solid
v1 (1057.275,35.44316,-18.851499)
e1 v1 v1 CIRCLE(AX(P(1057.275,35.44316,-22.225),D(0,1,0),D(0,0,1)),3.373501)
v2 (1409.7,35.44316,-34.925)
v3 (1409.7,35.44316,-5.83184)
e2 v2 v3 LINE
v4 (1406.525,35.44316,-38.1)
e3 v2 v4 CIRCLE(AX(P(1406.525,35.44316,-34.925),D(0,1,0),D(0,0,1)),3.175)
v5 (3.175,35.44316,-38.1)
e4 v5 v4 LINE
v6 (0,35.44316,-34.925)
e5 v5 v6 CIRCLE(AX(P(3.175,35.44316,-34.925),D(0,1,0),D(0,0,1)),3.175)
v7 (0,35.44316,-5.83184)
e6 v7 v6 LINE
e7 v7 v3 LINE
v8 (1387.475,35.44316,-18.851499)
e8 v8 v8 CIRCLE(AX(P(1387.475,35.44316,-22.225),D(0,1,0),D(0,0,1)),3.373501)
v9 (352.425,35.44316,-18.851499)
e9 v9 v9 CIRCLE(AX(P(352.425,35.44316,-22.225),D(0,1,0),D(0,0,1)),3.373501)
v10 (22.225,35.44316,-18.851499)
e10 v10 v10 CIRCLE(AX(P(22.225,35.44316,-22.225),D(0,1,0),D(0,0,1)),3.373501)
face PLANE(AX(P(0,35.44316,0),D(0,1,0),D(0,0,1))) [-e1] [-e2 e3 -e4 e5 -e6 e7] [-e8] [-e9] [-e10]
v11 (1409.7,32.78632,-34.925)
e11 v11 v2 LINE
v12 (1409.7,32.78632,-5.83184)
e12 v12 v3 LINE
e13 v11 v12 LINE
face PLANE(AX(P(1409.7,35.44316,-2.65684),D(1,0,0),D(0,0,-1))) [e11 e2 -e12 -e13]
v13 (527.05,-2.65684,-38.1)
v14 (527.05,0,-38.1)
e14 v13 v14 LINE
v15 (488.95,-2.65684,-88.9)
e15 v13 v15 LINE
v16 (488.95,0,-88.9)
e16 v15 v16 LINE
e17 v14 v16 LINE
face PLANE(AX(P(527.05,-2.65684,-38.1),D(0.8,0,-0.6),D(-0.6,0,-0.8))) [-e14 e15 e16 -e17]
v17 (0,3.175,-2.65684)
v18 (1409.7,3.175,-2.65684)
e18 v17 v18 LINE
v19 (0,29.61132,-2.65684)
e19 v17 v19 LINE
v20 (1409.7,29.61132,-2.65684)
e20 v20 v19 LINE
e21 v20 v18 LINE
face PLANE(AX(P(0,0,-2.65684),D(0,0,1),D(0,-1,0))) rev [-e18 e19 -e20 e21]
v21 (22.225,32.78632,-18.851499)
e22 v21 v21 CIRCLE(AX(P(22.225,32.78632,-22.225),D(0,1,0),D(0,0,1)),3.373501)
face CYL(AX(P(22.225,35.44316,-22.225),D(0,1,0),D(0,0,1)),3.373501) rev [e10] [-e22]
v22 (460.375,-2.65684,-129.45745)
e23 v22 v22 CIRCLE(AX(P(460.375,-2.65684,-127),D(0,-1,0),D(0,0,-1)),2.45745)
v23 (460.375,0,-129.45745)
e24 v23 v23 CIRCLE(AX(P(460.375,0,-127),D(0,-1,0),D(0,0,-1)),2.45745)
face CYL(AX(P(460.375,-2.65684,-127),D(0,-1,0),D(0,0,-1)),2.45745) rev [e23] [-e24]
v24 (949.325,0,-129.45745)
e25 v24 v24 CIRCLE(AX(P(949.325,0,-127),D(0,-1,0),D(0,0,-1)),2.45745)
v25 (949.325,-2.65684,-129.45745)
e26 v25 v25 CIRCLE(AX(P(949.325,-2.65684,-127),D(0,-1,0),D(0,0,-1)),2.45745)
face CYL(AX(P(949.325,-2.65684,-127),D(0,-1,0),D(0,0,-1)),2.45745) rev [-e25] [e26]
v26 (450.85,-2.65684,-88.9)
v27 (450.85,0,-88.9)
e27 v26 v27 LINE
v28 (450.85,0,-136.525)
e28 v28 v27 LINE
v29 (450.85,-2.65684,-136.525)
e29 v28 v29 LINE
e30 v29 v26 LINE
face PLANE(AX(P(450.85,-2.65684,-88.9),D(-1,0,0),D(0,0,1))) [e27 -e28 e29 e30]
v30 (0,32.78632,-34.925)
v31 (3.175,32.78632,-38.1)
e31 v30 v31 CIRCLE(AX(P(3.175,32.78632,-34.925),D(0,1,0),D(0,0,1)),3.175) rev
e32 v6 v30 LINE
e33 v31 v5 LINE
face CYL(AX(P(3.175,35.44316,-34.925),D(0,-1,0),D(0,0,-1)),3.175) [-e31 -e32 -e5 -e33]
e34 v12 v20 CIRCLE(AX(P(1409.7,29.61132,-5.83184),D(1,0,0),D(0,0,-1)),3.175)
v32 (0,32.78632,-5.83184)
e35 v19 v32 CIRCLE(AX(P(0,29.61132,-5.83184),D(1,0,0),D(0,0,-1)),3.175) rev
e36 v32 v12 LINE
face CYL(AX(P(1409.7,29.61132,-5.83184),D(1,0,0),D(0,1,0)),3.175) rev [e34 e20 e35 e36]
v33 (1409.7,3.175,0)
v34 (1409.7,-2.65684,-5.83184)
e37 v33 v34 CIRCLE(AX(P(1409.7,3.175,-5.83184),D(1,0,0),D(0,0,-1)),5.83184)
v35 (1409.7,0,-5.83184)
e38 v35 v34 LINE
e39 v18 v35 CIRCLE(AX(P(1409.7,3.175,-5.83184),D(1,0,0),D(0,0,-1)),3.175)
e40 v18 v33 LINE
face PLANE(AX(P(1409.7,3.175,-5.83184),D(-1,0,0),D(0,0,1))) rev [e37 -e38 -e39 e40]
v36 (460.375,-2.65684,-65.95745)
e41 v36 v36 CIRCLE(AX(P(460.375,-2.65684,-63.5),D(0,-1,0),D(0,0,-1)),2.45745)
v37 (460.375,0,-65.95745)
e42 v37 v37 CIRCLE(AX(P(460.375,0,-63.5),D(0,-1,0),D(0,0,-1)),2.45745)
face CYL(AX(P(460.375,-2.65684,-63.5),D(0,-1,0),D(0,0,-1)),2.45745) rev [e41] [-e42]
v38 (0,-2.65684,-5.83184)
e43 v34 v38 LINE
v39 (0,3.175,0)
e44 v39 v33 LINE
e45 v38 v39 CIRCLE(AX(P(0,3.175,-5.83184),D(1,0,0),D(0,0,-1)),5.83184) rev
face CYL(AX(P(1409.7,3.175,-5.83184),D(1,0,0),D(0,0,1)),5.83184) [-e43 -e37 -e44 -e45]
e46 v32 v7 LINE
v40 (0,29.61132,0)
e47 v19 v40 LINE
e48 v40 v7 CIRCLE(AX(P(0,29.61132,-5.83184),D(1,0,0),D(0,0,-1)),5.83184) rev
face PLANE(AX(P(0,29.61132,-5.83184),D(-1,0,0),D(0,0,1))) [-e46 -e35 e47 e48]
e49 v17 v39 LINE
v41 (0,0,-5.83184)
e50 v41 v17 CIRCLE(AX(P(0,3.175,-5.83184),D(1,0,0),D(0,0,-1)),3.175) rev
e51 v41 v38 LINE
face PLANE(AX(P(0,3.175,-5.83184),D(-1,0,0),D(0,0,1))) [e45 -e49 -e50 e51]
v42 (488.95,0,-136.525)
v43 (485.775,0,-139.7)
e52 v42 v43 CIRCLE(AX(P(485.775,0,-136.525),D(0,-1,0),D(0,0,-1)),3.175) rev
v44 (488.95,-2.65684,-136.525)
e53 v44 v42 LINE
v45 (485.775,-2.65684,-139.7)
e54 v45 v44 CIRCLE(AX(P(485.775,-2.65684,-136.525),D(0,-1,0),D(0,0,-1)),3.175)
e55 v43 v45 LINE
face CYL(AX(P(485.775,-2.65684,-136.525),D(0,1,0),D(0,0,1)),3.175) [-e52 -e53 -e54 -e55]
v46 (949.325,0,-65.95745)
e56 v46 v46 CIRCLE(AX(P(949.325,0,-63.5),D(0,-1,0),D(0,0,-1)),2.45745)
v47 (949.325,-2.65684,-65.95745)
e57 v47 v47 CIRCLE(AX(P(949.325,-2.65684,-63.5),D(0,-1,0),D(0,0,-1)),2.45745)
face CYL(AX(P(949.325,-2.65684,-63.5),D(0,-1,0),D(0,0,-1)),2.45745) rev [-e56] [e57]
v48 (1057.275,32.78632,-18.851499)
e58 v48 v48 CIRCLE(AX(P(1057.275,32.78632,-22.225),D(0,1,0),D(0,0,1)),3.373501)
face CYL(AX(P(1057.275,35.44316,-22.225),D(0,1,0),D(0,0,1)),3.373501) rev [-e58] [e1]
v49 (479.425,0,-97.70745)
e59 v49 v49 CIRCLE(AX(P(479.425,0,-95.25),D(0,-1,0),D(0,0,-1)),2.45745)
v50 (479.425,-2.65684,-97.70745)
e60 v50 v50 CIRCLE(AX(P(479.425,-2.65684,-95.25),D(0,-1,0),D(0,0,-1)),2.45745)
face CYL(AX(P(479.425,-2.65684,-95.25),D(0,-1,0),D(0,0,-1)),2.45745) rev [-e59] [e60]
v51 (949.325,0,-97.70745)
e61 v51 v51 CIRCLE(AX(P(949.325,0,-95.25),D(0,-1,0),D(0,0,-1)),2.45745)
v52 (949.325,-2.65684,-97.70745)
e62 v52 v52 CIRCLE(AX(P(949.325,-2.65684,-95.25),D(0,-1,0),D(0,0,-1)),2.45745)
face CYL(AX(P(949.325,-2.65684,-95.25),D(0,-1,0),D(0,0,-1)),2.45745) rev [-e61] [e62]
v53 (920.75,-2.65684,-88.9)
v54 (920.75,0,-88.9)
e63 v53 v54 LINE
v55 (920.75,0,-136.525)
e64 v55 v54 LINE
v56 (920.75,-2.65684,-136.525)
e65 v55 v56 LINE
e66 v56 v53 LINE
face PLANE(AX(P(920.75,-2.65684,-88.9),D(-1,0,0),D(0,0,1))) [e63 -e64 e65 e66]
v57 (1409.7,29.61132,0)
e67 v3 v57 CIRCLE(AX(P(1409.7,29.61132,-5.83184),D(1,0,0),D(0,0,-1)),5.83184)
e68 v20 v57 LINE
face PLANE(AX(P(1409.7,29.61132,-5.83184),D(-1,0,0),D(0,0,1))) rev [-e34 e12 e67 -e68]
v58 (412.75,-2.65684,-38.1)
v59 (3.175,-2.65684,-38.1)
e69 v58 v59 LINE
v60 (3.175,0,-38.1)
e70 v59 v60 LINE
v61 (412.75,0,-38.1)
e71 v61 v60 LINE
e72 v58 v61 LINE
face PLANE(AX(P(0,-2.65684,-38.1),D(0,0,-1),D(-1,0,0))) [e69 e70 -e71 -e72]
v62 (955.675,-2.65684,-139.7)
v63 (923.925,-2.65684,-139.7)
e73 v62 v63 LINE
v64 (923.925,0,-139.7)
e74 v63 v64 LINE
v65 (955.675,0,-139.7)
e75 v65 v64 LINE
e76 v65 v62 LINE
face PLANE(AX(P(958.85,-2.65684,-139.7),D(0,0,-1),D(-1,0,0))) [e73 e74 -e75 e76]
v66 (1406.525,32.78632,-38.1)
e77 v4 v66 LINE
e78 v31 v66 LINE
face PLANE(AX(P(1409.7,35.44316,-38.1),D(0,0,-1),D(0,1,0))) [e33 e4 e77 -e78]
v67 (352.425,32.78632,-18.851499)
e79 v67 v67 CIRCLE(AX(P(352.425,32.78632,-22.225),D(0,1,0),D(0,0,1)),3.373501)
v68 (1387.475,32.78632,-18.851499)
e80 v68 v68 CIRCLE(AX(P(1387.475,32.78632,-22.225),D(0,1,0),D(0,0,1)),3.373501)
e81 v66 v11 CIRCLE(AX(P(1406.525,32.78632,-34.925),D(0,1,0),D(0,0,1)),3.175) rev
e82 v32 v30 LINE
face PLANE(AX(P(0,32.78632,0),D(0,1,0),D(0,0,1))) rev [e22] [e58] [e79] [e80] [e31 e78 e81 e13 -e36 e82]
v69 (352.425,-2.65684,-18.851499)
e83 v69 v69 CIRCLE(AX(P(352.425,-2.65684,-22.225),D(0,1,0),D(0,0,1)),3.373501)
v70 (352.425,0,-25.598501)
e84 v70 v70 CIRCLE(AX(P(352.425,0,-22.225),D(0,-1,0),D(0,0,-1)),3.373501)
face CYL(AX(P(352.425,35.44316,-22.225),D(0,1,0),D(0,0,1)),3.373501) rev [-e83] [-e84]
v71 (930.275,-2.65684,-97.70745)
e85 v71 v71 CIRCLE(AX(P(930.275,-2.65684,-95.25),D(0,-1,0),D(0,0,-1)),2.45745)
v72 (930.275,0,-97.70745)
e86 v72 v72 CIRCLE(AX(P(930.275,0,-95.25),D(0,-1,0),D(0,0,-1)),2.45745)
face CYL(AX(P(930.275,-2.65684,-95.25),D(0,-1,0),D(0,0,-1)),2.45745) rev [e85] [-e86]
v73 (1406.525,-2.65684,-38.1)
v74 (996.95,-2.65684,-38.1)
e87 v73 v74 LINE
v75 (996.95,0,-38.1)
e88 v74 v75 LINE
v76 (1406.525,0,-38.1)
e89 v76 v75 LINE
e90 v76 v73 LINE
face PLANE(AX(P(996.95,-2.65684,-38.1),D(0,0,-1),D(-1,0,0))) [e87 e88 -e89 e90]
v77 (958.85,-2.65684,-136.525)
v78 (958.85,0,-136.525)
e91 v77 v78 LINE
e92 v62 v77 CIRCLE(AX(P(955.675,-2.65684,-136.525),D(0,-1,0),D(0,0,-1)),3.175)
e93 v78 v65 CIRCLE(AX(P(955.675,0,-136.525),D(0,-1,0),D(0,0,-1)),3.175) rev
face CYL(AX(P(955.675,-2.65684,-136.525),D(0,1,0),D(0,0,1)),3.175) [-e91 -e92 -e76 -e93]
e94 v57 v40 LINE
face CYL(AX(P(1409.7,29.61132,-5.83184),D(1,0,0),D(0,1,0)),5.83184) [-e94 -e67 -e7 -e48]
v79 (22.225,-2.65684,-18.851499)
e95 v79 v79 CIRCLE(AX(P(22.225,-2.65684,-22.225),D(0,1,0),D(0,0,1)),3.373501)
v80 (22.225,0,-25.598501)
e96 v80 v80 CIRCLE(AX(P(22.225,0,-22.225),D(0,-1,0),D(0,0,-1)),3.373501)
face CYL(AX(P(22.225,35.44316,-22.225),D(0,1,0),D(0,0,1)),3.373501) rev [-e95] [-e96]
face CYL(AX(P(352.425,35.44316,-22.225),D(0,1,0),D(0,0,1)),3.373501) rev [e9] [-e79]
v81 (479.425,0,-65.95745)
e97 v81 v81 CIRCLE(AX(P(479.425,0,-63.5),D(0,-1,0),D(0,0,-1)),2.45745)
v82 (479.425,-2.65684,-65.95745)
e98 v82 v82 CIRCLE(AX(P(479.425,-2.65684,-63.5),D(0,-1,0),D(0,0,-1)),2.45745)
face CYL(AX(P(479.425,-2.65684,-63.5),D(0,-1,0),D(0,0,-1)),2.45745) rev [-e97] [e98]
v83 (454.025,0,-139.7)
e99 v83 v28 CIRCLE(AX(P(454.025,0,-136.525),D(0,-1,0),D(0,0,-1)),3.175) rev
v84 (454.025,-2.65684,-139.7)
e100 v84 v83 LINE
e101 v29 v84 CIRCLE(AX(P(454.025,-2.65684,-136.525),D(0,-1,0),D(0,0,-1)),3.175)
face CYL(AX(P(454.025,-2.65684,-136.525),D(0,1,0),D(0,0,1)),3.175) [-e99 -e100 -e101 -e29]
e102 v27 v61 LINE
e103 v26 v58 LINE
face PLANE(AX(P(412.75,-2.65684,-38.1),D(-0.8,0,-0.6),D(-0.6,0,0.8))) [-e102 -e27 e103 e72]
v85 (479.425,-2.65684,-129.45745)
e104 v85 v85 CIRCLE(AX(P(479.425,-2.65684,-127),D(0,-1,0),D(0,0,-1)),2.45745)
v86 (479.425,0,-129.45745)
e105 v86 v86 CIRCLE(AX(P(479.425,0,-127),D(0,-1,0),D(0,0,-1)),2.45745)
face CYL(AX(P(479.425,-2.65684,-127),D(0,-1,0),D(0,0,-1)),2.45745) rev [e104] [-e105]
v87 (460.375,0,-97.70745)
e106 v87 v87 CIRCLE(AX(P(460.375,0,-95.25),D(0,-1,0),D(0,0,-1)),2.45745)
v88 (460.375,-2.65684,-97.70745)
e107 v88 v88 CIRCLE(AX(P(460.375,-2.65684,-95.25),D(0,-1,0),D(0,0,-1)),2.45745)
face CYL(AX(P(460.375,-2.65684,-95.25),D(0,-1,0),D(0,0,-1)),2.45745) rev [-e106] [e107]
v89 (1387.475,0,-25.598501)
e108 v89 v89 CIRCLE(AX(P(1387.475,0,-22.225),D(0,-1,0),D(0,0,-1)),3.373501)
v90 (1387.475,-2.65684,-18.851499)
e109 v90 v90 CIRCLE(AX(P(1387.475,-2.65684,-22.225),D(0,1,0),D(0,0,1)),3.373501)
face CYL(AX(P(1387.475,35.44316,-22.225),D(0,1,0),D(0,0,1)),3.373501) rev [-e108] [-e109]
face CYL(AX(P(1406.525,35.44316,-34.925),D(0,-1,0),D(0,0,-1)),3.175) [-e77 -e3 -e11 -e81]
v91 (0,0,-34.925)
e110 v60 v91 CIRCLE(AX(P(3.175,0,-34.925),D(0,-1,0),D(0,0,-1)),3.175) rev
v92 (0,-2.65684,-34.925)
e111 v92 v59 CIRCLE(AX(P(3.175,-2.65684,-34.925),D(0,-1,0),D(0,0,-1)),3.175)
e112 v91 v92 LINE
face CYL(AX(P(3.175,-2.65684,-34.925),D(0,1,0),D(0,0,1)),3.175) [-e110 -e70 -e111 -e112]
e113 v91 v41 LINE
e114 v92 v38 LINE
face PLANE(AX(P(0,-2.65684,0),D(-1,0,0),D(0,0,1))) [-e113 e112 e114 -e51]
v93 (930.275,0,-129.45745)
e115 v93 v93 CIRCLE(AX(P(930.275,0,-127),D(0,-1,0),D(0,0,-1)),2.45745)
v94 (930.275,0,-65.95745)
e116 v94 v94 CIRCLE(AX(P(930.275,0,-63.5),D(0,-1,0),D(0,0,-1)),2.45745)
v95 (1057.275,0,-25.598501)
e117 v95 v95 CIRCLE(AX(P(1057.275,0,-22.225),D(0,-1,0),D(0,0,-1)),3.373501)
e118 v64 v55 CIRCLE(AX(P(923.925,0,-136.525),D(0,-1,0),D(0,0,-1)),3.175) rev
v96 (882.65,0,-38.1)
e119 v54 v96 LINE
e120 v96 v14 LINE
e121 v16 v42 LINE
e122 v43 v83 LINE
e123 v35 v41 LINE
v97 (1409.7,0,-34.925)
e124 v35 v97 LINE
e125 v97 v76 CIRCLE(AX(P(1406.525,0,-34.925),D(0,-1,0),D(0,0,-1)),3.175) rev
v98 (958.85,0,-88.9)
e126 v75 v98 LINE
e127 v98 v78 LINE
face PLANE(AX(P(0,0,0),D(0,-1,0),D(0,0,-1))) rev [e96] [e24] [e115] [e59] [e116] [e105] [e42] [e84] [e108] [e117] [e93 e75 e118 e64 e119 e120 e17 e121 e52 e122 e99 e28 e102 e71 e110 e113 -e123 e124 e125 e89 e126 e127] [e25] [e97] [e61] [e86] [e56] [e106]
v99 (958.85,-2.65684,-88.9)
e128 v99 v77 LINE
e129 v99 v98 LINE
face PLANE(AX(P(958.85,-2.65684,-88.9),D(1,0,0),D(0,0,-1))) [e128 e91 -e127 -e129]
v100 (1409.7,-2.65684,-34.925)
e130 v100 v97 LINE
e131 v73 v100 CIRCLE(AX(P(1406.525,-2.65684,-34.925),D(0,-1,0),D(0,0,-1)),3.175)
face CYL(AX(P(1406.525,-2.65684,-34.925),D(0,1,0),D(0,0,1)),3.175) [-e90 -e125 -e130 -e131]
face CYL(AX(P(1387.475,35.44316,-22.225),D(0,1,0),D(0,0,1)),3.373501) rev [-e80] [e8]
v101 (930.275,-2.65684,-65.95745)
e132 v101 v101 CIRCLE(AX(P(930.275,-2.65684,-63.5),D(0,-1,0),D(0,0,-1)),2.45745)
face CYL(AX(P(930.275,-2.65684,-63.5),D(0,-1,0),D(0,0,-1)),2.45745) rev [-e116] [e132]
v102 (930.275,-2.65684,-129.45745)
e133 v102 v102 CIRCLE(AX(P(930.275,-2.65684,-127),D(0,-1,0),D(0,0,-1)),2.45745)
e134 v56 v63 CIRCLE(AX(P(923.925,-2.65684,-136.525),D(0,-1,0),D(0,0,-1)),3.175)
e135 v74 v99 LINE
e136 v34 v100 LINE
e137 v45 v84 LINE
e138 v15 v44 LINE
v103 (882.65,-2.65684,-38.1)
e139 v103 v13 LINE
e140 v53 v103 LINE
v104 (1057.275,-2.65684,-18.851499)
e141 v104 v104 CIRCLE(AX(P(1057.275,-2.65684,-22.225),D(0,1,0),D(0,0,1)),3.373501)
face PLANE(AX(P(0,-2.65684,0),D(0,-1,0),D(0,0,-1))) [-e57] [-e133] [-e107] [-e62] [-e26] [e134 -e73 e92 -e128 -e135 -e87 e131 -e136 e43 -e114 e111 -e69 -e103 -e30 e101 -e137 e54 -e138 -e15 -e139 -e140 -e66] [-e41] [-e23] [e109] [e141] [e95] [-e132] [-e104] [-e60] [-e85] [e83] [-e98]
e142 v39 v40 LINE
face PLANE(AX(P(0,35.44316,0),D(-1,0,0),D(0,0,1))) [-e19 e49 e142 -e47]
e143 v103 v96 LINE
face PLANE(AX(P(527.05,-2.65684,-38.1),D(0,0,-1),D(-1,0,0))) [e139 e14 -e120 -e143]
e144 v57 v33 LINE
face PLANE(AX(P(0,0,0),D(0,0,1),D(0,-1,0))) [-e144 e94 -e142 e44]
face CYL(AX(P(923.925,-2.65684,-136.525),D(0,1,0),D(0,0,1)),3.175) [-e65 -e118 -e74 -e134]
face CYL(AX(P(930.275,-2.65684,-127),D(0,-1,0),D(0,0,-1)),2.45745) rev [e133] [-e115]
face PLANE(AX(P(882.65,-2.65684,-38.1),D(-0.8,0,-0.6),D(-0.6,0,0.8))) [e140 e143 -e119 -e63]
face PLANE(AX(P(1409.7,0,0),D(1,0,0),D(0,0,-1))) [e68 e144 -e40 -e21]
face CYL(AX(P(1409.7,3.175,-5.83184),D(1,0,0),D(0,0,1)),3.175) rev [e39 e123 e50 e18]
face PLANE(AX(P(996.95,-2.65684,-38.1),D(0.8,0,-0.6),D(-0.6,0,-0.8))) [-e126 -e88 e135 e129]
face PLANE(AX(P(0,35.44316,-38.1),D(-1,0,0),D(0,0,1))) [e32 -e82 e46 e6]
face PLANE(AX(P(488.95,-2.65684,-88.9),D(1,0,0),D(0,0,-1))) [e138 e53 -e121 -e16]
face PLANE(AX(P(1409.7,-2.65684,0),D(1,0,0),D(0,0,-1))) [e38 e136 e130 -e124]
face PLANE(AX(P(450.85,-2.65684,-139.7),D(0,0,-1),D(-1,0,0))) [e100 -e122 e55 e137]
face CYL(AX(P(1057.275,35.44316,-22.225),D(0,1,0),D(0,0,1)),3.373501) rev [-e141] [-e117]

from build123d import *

# Parameters (mm, degrees)
BASE_FLANGE1_DEPTH               = 2.65684
EDGE_FLANGE3_STRIP_W             = 16.97736
EDGE_FLANGE3_STRIP_H             = 2.65684
EDGE_FLANGE3_STRIP_CUT_DEPTH     = 1409.7
EDGE_FLANGE3_DEPTH               = 1409.7
EDGE_FLANGE4_STRIP_W             = 16.97736
EDGE_FLANGE4_STRIP_H             = 2.65684
EDGE_FLANGE4_STRIP_CUT_DEPTH     = 1409.7
EDGE_FLANGE4_DEPTH               = 1409.7
F_10_0_1935_DIAMETER_HOLE1_D     = 4.9149
F_17_64_0_26563_DIAMETER_HOLE1_D = 6.747002
FILLET1_R                        = 3.175


# Sheet-metal steps are written as plain solids
with BuildPart() as part:
    # Sketch1 → Base-Flange1 (new body)
    with BuildSketch(Plane(origin=(0, 0, 0), x_dir=(1, 0, 0), z_dir=(0, 1, 0))):
        Polygon((0, 0), (1409.7, 0), (1409.7, 38.1), (996.95, 38.1), (958.85, 88.9), (958.85, 139.7), (920.75, 139.7), (920.75, 88.9), (882.65, 38.1), (527.05, 38.1), (488.95, 88.9), (488.95, 139.7), (450.85, 139.7), (450.85, 88.9), (412.75, 38.1), (0, 38.1), align=None)
    extrude(amount=-BASE_FLANGE1_DEPTH)

    # Edge-Flange3 strip (across the edge) → Edge-Flange3 strip cut (cut)
    with BuildSketch(Plane(origin=(0, 0, 0), x_dir=(0, 0, -1), z_dir=(1, 0, 0))):
        with Locations((-2.65684, -1.32842)):
            Rectangle(EDGE_FLANGE3_STRIP_W, EDGE_FLANGE3_STRIP_H)
    extrude(amount=EDGE_FLANGE3_STRIP_CUT_DEPTH, mode=Mode.SUBTRACT)

    # Edge-Flange3 section (across the edge) → Edge-Flange3 (add)
    with BuildSketch(Plane(origin=(0, 0, 0), x_dir=(0, 0, -1), z_dir=(1, 0, 0))):
        with BuildLine():
            Line((0, 3.175), (0, 35.44316))
            Line((0, 35.44316), (2.65684, 35.44316))
            Line((2.65684, 35.44316), (2.65684, 3.175))
            ThreePointArc((2.65684, 3.175), (3.58677597, 0.92993597), (5.83184, 0))
            Line((5.83184, 0), (5.83184, -2.65684))
            ThreePointArc((5.83184, -2.65684), (1.708106389, -0.948733611), (0, 3.175))
        make_face()
    extrude(amount=EDGE_FLANGE3_DEPTH)

    # Edge-Flange4 strip (across the edge) → Edge-Flange4 strip cut (cut)
    with BuildSketch(Plane(origin=(0, 35.44316, -2.65684), x_dir=(0, -1, 0), z_dir=(1, 0, 0))):
        with Locations((-2.65684, -1.32842)):
            Rectangle(EDGE_FLANGE4_STRIP_W, EDGE_FLANGE4_STRIP_H)
    extrude(amount=EDGE_FLANGE4_STRIP_CUT_DEPTH, mode=Mode.SUBTRACT)

    # Edge-Flange4 section (across the edge) → Edge-Flange4 (add)
    with BuildSketch(Plane(origin=(0, 35.44316, -2.65684), x_dir=(0, -1, 0), z_dir=(1, 0, 0))):
        with BuildLine():
            Line((0, 3.175), (0, 35.44316))
            Line((0, 35.44316), (2.65684, 35.44316))
            Line((2.65684, 35.44316), (2.65684, 3.175))
            ThreePointArc((2.65684, 3.175), (3.58677597, 0.92993597), (5.83184, 0))
            Line((5.83184, 0), (5.83184, -2.65684))
            ThreePointArc((5.83184, -2.65684), (1.708106389, -0.948733611), (0, 3.175))
        make_face()
    extrude(amount=EDGE_FLANGE4_DEPTH)

    # #10 (0.1935) Diameter Hole1 (through all)
    with Locations(Plane(origin=(0, -2.65684, 0), x_dir=(-1, 0, 0), z_dir=(0, -1, 0))):
        with Locations((-460.375, 127), (-479.425, 127), (-460.375, 63.5), (-479.425, 63.5), (-460.375, 95.25), (-479.425, 95.25), (-930.275, 63.5), (-949.325, 63.5), (-930.275, 95.25), (-949.325, 95.25), (-949.325, 127), (-930.275, 127)):
            Hole(F_10_0_1935_DIAMETER_HOLE1_D / 2)

    # 17/64 (0.26563) Diameter Hole1 (through all)
    with Locations(Plane(origin=(0, 35.44316, 0), x_dir=(1, 0, 0), z_dir=(0, 1, 0))):
        with Locations((22.225, 22.225), (1057.275, 22.225), (1387.475, 22.225), (352.425, 22.225)):
            Hole(F_17_64_0_26563_DIAMETER_HOLE1_D / 2)

    # Fillet1
    fillet1_edges = [part.edges().sort_by_distance(p)[0] for p in [
        (0, -1.32842, -38.1),
        (0, 34.11474, -38.1),
        (1409.7, 34.11474, -38.1),
        (1409.7, -1.32842, -38.1),
        (450.85, -1.32842, -139.7),
        (488.95, -1.32842, -139.7),
        (958.85, -1.32842, -139.7),
        (920.75, -1.32842, -139.7),
    ]]
    fillet(fillet1_edges, radius=FILLET1_R)


solid = part.part
